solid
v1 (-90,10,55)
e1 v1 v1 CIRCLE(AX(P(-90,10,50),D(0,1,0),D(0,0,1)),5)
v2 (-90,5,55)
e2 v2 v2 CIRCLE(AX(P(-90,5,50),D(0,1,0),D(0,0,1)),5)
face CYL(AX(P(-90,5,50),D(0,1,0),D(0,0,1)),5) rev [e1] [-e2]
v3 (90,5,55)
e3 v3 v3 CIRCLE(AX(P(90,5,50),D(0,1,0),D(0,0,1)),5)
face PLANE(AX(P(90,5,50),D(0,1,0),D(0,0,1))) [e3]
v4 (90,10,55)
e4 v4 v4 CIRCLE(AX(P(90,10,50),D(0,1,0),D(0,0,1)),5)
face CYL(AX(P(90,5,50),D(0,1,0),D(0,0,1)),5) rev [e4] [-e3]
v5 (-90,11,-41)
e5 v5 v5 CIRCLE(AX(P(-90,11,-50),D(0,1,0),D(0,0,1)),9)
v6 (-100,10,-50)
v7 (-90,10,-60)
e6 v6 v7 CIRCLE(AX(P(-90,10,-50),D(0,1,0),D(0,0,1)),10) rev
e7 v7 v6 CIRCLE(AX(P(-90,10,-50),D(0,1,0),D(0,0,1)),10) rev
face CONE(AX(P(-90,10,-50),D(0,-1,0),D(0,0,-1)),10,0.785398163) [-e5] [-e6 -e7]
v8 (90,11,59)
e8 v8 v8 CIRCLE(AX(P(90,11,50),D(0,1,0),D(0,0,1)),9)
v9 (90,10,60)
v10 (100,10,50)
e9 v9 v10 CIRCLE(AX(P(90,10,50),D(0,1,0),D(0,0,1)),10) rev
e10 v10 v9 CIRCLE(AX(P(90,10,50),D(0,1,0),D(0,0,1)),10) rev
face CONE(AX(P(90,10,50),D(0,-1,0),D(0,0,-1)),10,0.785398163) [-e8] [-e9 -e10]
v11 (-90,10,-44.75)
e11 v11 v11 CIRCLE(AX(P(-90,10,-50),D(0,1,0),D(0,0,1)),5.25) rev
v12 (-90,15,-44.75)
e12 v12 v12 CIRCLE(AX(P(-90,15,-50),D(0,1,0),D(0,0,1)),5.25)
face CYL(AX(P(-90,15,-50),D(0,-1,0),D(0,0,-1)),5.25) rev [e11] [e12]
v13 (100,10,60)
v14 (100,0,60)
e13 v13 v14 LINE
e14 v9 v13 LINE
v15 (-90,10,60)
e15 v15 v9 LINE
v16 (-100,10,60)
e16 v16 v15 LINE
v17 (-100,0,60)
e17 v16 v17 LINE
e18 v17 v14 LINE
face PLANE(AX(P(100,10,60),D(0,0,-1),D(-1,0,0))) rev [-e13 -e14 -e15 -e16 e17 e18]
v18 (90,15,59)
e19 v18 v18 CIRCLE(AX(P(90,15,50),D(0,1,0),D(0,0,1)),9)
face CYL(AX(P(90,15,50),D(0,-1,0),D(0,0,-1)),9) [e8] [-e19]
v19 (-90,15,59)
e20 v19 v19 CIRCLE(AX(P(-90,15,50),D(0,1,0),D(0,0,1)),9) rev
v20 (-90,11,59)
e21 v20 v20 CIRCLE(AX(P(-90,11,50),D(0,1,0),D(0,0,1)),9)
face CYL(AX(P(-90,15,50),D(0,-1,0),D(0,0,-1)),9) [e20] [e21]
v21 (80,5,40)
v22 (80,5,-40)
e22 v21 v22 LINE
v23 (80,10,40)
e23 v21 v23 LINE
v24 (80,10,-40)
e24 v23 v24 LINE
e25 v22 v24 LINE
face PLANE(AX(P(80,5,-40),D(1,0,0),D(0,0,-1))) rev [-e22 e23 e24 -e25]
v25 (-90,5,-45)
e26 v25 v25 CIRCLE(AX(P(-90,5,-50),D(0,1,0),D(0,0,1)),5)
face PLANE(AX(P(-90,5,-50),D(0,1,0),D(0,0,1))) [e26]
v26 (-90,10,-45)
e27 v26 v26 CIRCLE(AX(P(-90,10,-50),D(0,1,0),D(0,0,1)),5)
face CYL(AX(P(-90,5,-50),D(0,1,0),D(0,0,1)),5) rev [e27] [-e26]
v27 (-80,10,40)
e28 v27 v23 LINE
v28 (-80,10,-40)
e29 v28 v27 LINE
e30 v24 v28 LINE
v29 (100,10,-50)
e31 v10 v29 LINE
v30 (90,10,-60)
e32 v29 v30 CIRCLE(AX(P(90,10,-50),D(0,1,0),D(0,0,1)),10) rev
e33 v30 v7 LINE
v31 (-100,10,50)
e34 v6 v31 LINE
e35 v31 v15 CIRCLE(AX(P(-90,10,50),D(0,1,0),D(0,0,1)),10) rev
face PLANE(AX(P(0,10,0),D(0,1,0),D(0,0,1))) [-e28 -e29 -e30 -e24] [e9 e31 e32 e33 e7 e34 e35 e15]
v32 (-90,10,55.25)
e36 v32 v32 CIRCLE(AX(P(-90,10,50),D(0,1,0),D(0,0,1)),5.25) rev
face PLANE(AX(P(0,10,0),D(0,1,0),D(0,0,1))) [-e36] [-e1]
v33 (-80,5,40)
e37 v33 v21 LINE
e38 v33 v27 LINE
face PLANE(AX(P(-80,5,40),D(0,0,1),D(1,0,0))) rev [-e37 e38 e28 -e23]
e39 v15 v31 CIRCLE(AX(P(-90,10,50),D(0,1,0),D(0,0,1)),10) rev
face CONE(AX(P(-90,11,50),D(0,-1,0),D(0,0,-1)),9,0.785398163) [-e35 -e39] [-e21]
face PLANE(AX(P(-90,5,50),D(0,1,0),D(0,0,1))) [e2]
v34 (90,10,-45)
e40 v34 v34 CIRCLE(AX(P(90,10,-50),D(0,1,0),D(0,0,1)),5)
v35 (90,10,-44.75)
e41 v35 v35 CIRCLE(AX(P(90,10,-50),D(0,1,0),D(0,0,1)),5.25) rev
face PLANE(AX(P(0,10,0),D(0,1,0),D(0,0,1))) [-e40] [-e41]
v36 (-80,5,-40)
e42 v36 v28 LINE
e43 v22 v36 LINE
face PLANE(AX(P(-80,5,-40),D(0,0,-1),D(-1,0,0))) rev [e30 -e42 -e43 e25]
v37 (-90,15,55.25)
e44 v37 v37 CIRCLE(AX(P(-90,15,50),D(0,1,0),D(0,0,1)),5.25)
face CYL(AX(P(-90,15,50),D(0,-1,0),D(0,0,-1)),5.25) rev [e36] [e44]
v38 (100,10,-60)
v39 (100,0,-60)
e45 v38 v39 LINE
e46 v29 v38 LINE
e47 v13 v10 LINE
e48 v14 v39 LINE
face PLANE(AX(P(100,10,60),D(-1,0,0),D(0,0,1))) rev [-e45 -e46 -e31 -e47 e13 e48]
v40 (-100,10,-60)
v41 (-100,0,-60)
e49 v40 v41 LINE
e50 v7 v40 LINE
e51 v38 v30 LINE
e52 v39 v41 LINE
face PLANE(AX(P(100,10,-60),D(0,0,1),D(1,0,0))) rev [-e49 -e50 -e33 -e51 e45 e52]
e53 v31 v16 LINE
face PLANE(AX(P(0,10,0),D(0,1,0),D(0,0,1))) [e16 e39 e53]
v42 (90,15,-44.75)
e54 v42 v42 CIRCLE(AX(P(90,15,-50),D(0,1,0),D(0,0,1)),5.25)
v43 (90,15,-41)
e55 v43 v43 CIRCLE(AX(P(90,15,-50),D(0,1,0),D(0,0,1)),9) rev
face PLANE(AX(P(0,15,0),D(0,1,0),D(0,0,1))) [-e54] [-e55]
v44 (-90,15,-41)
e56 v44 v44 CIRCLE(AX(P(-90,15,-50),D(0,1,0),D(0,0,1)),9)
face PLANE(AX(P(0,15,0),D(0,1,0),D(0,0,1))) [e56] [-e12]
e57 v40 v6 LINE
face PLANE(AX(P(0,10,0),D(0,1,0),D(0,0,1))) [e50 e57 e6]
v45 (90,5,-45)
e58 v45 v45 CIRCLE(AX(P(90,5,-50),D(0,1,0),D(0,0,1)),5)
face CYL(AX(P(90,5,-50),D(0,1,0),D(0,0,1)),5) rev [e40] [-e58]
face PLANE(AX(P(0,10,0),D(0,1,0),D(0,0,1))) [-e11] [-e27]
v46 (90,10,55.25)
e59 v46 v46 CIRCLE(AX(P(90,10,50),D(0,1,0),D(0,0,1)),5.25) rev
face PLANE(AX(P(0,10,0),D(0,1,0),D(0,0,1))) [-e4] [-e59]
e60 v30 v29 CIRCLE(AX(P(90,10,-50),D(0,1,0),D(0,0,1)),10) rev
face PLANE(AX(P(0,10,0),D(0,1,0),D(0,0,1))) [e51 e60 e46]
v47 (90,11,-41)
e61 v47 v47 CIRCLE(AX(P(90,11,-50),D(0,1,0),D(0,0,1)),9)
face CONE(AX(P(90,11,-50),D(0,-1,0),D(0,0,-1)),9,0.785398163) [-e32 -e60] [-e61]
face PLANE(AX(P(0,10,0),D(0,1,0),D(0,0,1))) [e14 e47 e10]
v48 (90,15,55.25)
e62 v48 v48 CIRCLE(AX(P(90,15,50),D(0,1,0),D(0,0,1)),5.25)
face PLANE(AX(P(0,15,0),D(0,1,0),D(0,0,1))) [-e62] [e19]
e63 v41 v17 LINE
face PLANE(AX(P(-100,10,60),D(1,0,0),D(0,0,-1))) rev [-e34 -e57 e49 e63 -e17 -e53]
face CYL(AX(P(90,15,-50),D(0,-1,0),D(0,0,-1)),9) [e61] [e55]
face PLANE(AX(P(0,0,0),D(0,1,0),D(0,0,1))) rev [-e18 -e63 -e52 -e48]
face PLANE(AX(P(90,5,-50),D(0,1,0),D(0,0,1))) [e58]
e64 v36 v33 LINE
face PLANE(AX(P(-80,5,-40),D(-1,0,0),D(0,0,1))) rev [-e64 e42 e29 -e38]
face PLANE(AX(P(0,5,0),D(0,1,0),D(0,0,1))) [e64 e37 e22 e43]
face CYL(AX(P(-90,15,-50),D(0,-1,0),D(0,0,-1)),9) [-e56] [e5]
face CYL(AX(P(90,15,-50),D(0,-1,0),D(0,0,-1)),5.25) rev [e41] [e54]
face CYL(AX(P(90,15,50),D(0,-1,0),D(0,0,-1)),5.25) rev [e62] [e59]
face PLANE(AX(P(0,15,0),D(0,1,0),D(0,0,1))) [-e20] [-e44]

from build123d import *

# Parameters (mm, degrees)
SKETCH1_W           = 200
SKETCH1_H           = 120
BOSS_EXTRUDE3_DEPTH = 10
SKETCH3_R           = 5
SKETCH3_W           = 160
SKETCH3_H           = 80
CUT_EXTRUDE2_DEPTH  = 5
SKETCH6_R           = 9
SKETCH6_R_2         = 5.25
BOSS_EXTRUDE4_DEPTH = 10
CHAMFER1_SIZE       = 1


with BuildPart() as part:
    # Sketch1 → Boss-Extrude3 (new body)
    with BuildSketch(Plane(origin=(0, 0, 0), x_dir=(1, 0, 0), z_dir=(0, 1, 0))):
        Rectangle(SKETCH1_W, SKETCH1_H)
    extrude(amount=BOSS_EXTRUDE3_DEPTH)

    # Sketch3 → Cut-Extrude2 (cut)
    with BuildSketch(Plane(origin=(0, 10, 0), x_dir=(1, 0, 0), z_dir=(0, 1, 0))):
        with Locations(Location((-90, 50, 0), (0, 0, 270))):
            Circle(SKETCH3_R)
        with Locations(Location((90, -50, 0), (0, 0, 270))):
            Circle(SKETCH3_R)
        with Locations(Location((90, 50, 0), (0, 0, 270))):
            Circle(SKETCH3_R)
        with Locations(Location((-90, -50, 0), (0, 0, 270))):
            Circle(SKETCH3_R)
        Rectangle(SKETCH3_W, SKETCH3_H)
    extrude(amount=-CUT_EXTRUDE2_DEPTH, mode=Mode.SUBTRACT)

    # Sketch6 → Boss-Extrude4 (add)
    # profile 1 of 4: a face of its own
    with BuildSketch(Plane(origin=(0, 5, 0), x_dir=(1, 0, 0), z_dir=(0, 1, 0))):
        with Locations(Location((-90, 50, 0), (0, 0, 270))):
            Circle(SKETCH6_R)
        with Locations(Location((-90, 50, 0), (0, 0, 270))):
            Circle(SKETCH6_R_2, mode=Mode.SUBTRACT)
    # profile 2 of 4: a face of its own
    with BuildSketch(Plane(origin=(0, 5, 0), x_dir=(1, 0, 0), z_dir=(0, 1, 0))):
        with Locations(Location((90, 50, 0), (0, 0, 270))):
            Circle(SKETCH6_R)
        with Locations(Location((90, 50, 0), (0, 0, 270))):
            Circle(SKETCH6_R_2, mode=Mode.SUBTRACT)
    # profile 3 of 4: a face of its own
    with BuildSketch(Plane(origin=(0, 5, 0), x_dir=(1, 0, 0), z_dir=(0, 1, 0))):
        with Locations(Location((90, -50, 0), (0, 0, 270))):
            Circle(SKETCH6_R)
        with Locations(Location((90, -50, 0), (0, 0, 270))):
            Circle(SKETCH6_R_2, mode=Mode.SUBTRACT)
    # profile 4 of 4: a face of its own
    with BuildSketch(Plane(origin=(0, 5, 0), x_dir=(1, 0, 0), z_dir=(0, 1, 0))):
        with Locations(Location((-90, -50, 0), (0, 0, 270))):
            Circle(SKETCH6_R)
        with Locations(Location((-90, -50, 0), (0, 0, 270))):
            Circle(SKETCH6_R_2, mode=Mode.SUBTRACT)
    extrude(amount=BOSS_EXTRUDE4_DEPTH)

    # Chamfer1
    chamfer1_edges = [part.edges().sort_by_distance(p)[0] for p in [
        (-90, 10, -59),
        (90, 10, -59),
        (90, 10, 41),
        (-90, 10, 41),
    ]]
    chamfer(chamfer1_edges, length=CHAMFER1_SIZE - 0.0001)  # a hair under: the kernel refuses the full size


solid = part.part
